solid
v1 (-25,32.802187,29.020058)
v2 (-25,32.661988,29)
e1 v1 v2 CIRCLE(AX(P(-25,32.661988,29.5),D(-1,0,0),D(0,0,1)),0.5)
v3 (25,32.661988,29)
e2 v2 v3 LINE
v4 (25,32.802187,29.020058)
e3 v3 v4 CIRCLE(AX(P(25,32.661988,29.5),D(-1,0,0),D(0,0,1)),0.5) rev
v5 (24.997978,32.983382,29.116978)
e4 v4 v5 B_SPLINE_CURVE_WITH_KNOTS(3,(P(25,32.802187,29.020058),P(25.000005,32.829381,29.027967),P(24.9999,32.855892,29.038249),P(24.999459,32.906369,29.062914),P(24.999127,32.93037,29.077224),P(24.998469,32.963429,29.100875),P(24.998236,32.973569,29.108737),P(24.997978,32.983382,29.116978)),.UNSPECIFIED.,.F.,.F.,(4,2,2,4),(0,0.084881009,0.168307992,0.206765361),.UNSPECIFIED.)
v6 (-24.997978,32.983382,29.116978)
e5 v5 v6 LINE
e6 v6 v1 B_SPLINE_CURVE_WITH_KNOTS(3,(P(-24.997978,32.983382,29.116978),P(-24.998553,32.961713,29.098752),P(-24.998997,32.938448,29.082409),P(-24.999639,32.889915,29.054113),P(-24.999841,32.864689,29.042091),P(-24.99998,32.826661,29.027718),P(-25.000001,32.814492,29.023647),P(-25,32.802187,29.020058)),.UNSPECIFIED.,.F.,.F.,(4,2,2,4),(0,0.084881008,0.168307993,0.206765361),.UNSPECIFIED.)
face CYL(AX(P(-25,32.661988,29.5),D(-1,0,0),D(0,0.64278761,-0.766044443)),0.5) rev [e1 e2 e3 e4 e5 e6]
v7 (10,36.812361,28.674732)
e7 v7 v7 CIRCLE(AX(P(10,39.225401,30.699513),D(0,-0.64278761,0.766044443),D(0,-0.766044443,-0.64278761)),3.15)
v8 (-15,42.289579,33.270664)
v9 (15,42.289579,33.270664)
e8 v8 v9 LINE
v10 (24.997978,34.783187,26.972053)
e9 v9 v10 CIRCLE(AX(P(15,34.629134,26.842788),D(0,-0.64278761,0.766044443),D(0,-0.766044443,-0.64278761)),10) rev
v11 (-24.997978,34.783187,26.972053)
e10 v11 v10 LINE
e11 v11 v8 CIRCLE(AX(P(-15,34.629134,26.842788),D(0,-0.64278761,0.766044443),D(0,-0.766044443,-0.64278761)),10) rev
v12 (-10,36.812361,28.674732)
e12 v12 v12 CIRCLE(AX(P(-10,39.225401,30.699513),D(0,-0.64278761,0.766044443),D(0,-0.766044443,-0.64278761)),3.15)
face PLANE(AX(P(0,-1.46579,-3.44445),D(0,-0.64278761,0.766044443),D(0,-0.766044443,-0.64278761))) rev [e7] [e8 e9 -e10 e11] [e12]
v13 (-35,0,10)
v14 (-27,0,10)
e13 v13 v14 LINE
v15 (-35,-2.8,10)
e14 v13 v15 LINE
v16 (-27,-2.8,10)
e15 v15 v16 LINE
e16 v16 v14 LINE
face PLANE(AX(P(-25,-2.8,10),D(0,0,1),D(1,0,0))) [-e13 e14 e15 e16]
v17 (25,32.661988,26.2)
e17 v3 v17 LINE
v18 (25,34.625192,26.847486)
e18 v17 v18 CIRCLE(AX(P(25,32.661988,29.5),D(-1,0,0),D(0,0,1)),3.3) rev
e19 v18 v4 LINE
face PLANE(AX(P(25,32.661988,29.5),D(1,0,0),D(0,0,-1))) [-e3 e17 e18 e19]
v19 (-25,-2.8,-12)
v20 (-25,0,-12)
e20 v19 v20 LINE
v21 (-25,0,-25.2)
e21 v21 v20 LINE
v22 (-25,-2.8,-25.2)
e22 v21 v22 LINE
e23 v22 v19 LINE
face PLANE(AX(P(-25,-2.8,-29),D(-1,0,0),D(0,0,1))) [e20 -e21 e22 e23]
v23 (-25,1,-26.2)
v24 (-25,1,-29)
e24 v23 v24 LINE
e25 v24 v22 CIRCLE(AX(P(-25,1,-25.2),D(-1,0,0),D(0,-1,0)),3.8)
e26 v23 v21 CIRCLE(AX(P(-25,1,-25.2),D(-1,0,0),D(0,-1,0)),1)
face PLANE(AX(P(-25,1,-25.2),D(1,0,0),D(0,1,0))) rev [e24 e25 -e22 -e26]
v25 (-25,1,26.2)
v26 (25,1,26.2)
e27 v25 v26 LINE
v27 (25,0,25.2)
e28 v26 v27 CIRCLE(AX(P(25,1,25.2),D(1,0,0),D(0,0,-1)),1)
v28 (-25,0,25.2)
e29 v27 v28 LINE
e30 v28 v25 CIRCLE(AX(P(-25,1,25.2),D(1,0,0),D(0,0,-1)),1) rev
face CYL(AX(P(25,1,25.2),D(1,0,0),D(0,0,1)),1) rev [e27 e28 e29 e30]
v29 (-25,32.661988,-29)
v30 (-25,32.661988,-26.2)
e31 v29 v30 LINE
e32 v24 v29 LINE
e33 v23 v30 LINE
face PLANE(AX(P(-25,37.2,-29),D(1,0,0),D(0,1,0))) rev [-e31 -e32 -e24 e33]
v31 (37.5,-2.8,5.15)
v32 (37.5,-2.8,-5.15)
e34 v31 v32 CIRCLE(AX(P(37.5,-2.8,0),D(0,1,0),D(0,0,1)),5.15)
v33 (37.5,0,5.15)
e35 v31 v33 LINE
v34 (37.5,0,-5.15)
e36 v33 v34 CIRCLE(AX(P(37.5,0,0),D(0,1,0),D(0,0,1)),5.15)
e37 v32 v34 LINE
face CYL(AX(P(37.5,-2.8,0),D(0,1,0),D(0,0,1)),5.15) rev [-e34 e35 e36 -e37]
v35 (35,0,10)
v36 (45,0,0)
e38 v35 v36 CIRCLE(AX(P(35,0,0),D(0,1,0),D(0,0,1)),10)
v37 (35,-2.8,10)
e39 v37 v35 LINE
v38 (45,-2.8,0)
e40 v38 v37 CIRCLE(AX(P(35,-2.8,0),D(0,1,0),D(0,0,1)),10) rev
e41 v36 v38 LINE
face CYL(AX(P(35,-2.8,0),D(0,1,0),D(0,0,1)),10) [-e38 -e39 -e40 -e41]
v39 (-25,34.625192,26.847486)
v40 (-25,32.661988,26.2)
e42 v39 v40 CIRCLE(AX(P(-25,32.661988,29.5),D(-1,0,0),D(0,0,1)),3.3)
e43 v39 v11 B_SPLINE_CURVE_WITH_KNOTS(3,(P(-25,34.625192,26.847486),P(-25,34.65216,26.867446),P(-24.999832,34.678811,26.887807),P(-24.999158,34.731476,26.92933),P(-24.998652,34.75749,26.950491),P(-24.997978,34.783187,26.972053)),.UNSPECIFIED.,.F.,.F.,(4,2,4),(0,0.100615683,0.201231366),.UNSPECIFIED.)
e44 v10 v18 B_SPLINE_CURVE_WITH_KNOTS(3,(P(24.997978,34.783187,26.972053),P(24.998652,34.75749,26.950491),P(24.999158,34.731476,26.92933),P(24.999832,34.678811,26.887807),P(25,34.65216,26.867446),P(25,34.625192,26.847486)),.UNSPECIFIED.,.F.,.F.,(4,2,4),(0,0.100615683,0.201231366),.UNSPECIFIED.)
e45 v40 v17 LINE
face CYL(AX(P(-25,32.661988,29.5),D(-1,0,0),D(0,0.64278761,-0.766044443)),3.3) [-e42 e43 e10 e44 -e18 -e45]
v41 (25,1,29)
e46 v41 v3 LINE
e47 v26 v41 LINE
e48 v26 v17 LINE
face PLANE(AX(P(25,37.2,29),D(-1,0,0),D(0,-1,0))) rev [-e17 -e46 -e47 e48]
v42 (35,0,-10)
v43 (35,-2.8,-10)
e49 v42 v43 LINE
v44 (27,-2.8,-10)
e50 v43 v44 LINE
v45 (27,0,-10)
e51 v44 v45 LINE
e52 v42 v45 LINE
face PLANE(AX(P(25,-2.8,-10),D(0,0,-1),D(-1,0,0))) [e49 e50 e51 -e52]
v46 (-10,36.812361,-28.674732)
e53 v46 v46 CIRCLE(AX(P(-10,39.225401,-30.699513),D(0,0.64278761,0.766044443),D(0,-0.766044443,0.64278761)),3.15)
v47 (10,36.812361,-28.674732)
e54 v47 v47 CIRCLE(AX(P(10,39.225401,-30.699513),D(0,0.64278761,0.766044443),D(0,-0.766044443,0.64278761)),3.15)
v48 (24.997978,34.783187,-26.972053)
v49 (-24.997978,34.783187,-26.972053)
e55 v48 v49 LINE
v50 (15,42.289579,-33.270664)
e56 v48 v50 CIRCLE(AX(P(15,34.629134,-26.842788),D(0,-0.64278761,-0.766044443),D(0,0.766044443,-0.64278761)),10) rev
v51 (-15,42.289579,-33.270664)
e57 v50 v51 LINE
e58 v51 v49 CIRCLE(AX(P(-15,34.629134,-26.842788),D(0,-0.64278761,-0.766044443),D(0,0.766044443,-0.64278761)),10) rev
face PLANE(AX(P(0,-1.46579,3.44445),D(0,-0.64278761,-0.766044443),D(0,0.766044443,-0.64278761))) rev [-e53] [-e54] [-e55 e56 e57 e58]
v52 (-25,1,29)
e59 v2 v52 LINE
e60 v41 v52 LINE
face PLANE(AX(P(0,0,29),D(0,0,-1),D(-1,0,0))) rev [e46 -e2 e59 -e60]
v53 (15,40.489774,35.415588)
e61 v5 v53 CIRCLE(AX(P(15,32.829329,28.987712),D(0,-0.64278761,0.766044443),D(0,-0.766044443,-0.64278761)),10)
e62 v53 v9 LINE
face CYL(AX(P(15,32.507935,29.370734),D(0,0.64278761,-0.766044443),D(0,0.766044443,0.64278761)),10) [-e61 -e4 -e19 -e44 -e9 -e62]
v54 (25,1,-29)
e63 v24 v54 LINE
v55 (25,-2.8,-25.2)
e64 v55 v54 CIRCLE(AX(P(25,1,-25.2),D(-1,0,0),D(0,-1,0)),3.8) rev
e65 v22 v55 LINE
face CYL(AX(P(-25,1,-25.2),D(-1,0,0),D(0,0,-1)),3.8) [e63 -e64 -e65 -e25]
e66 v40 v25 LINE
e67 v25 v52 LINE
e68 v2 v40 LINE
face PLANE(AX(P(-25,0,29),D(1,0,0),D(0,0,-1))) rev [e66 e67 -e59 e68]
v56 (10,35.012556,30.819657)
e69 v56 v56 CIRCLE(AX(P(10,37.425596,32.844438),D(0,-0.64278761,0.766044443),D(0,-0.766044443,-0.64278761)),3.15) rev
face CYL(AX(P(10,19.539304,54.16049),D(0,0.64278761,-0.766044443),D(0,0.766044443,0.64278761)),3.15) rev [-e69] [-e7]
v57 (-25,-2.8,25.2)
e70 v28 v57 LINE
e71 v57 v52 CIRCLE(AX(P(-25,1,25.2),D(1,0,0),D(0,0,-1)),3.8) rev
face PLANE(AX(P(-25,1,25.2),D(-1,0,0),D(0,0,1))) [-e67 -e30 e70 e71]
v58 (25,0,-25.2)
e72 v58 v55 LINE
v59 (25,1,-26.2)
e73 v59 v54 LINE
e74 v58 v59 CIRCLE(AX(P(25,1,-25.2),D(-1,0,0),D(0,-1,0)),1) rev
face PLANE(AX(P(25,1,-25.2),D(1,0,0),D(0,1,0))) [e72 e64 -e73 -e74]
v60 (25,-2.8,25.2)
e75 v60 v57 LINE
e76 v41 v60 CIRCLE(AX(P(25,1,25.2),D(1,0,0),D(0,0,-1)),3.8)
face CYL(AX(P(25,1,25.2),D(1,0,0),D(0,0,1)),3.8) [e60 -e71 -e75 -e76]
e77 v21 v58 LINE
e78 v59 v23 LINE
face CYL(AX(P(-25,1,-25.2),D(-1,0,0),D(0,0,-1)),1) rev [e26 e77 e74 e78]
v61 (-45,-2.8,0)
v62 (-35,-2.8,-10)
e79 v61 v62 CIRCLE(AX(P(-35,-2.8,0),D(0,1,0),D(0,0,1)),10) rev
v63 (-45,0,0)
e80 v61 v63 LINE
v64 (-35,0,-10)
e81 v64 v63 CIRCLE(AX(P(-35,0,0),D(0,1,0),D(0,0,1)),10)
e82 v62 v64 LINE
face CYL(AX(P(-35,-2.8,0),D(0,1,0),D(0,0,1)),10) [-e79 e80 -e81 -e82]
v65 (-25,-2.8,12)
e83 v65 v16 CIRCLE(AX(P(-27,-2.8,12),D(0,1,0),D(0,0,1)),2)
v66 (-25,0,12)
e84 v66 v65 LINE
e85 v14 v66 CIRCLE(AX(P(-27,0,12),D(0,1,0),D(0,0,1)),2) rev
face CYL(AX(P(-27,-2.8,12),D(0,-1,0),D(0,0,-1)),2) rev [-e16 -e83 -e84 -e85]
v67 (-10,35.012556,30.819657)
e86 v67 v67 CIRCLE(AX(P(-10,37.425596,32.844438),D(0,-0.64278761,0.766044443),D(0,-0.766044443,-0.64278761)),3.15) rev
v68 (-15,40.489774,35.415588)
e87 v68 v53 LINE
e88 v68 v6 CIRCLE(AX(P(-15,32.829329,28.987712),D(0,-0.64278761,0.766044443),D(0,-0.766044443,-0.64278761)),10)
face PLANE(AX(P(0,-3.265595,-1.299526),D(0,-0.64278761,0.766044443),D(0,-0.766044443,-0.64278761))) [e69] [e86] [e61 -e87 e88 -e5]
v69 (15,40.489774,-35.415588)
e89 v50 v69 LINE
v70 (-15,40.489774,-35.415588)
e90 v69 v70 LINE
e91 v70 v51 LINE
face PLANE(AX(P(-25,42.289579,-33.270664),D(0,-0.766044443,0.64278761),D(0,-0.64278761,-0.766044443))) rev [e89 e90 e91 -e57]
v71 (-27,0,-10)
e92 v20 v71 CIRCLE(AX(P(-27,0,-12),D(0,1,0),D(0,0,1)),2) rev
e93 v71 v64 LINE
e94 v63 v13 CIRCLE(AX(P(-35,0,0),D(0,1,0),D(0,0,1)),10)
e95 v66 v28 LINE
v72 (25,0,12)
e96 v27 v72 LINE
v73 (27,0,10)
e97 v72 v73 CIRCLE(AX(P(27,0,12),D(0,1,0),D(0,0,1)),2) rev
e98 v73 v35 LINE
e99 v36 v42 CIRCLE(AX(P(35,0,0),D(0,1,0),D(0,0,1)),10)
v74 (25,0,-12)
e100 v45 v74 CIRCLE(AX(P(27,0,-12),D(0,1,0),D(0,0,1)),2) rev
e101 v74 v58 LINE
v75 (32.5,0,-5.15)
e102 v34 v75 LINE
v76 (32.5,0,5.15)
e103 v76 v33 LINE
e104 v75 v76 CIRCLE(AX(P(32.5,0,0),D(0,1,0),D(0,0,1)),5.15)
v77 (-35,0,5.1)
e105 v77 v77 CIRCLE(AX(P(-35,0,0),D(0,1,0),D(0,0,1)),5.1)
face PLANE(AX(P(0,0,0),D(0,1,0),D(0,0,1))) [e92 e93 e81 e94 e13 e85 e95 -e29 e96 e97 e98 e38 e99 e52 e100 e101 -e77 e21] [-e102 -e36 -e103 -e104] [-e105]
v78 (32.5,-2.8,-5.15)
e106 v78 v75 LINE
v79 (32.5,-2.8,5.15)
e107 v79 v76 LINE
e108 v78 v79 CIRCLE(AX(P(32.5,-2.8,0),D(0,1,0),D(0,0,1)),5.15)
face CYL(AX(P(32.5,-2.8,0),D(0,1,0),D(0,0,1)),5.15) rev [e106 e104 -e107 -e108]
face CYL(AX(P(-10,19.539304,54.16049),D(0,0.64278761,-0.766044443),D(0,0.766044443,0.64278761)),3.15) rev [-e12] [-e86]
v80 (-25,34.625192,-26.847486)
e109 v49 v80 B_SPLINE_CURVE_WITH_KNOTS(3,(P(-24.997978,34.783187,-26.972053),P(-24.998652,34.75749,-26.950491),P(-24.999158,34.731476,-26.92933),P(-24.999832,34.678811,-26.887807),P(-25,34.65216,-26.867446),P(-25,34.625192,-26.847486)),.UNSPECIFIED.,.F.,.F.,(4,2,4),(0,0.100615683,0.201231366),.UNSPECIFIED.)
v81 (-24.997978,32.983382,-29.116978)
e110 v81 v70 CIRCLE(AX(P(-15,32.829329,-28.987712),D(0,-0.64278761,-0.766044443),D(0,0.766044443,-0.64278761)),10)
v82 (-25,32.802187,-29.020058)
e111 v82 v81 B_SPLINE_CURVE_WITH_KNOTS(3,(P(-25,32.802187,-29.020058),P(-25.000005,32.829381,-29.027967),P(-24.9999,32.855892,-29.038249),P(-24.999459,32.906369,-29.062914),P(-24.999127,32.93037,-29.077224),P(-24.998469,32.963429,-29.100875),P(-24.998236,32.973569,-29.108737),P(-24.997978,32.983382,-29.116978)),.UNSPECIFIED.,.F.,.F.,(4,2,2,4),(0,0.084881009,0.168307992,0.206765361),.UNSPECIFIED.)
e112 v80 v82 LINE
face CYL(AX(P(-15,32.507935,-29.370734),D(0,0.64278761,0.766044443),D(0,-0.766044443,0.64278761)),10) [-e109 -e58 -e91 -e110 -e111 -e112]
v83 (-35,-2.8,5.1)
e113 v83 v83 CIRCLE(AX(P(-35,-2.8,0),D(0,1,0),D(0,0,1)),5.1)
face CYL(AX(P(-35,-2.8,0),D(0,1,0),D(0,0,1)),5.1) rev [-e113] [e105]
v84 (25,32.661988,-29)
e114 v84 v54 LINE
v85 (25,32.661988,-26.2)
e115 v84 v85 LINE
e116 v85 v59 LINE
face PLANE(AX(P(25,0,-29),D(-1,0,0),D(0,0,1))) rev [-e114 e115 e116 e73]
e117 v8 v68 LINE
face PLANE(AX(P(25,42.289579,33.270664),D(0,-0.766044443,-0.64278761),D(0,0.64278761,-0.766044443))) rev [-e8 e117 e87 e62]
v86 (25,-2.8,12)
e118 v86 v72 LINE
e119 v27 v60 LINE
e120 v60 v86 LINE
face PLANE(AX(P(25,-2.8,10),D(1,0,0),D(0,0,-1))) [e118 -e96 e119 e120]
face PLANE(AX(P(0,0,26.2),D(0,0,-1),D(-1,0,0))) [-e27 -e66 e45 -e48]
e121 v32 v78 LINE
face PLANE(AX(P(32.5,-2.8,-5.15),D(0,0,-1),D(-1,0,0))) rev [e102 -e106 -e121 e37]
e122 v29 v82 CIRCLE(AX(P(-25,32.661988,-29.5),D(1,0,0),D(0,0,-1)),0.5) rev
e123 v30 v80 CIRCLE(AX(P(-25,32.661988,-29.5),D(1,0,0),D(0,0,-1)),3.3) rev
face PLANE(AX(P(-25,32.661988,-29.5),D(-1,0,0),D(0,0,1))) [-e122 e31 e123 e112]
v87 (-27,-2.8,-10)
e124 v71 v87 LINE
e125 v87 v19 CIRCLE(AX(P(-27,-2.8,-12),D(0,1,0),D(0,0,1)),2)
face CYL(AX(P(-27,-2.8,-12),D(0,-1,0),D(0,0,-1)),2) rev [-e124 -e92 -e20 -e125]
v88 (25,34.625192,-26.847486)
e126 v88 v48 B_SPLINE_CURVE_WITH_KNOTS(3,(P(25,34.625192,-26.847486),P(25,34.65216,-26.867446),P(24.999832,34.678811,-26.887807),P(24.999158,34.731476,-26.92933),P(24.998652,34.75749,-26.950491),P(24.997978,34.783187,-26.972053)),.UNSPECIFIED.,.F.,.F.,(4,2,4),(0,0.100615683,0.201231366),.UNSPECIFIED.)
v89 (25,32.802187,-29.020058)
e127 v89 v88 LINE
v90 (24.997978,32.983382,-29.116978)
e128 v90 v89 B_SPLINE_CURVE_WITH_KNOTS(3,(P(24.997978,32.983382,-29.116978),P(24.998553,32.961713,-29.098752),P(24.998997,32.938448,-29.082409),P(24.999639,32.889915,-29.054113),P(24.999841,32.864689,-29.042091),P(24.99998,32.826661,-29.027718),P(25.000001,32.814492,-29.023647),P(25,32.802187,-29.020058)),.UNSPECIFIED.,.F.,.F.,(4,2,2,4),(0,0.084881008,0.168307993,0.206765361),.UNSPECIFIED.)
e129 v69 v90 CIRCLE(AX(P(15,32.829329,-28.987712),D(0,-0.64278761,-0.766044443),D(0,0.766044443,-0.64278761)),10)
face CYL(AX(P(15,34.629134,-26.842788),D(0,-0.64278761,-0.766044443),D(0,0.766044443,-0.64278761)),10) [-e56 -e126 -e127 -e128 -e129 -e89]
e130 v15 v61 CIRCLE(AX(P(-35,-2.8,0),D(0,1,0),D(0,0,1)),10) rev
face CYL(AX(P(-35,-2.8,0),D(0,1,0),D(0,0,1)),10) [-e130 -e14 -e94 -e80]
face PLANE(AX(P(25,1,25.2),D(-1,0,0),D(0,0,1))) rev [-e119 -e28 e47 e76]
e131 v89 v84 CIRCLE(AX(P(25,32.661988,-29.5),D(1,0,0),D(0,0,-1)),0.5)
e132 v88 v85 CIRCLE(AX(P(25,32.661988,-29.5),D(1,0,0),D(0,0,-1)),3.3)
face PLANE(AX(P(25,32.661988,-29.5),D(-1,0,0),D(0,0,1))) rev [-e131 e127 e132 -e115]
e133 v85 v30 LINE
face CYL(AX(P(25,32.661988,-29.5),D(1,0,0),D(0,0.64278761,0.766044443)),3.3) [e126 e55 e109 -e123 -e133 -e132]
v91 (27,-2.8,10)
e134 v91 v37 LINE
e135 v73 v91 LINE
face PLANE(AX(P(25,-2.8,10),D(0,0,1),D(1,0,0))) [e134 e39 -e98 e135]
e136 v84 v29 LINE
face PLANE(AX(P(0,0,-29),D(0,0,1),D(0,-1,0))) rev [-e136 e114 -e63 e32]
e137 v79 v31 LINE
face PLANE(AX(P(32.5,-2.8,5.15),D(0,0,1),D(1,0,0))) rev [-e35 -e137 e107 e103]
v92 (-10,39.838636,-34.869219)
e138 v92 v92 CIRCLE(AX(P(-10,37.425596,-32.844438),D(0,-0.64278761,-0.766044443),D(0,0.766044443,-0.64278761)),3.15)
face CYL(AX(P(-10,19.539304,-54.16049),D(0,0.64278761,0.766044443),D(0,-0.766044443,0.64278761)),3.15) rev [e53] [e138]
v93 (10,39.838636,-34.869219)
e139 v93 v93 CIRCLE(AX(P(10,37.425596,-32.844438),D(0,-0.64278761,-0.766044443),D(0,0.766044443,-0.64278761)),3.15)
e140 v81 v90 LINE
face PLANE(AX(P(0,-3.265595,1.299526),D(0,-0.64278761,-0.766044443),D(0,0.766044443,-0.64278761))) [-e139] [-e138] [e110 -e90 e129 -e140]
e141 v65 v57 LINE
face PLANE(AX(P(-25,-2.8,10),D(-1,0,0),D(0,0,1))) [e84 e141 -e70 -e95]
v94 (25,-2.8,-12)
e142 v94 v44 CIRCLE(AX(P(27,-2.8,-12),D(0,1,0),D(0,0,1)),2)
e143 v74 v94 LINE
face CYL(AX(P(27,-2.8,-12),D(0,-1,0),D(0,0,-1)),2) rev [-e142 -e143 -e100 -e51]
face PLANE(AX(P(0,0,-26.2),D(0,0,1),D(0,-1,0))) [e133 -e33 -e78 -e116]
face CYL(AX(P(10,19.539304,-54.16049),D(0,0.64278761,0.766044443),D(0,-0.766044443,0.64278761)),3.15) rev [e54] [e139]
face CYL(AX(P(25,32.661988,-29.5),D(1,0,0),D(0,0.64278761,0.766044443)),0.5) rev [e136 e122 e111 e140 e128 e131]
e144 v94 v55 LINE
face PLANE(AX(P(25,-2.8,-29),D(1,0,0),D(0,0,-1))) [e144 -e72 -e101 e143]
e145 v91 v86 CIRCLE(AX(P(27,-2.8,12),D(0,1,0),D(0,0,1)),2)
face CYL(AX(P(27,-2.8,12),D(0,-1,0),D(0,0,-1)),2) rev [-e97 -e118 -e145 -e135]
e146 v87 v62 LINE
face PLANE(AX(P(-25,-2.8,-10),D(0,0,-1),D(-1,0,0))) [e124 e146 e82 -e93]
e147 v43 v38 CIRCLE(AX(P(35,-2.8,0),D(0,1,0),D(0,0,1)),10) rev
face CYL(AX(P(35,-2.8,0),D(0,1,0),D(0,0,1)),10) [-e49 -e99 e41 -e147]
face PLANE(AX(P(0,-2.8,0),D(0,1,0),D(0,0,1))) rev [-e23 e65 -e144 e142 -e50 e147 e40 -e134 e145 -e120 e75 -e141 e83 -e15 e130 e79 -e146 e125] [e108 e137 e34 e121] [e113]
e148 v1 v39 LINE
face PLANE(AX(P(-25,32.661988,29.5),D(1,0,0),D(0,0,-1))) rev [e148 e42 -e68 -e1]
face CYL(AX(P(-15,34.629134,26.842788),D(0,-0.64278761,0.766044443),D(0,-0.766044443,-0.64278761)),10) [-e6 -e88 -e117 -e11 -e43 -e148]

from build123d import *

# Parameters (mm, degrees)
SKETCH1_R                      = 5.1
BASE_FLANGE1_DEPTH             = 2.8
EDGE_FLANGE1_STRIP_W           = 13.2
EDGE_FLANGE1_STRIP_H           = 2.8
EDGE_FLANGE1_STRIP_CUT_DEPTH   = 50
EDGE_FLANGE1_STRIP_2_W         = 13.2
EDGE_FLANGE1_STRIP_2_H         = 2.8
EDGE_FLANGE1_STRIP_CUT_2_DEPTH = 50
EDGE_FLANGE1_DEPTH             = 50
EDGE_FLANGE1_BEND_DEPTH        = 50
EDGE_FLANGE2_START             = -25
EDGE_FLANGE2_DEPTH             = 50
EDGE_FLANGE2_2_DEPTH           = 50
SKETCH20_R                     = 3.15
CUT_EXTRUDE1_DEPTH             = 72.206525832
FILLET1_R                      = 10
FILLET2_R                      = 2


# Read off the part's stored shape, not the designer's step: Edge-Flange2
# Sheet-metal steps are written as plain solids
with BuildPart() as part:
    # Sketch1 → Base-Flange1 (new body)
    with BuildSketch(Plane(origin=(0, 0, 0), x_dir=(1, 0, 0), z_dir=(0, 1, 0))):
        Polygon((-25, 29), (25, 29), (25, 10), (45, 10), (45, -10), (25, -10), (25, -29), (-25, -29), (-25, -10), (-45, -10), (-45, 10), (-25, 10), align=None)
        with Locations(Location((-35, 0, 0), (0, 0, 270))):
            Circle(SKETCH1_R, mode=Mode.SUBTRACT)
        with BuildLine():
            Line((32.5, 5.15), (37.5, 5.15))
            ThreePointArc((37.5, 5.15), (42.65, 0), (37.5, -5.15))
            Line((37.5, -5.15), (32.5, -5.15))
            ThreePointArc((32.5, -5.15), (27.35, 0), (32.5, 5.15))
        make_face(mode=Mode.SUBTRACT)
    extrude(amount=-BASE_FLANGE1_DEPTH)

    # Edge-Flange1 strip (across the edge) → Edge-Flange1 strip cut (cut)
    with BuildSketch(Plane(origin=(25, 0, -29), x_dir=(0, 0, 1), z_dir=(-1, 0, 0))):
        with Locations((-2.8, -1.4)):
            Rectangle(EDGE_FLANGE1_STRIP_W, EDGE_FLANGE1_STRIP_H)
    extrude(amount=EDGE_FLANGE1_STRIP_CUT_DEPTH, mode=Mode.SUBTRACT)

    # Edge-Flange1 strip 2 (across the edge) → Edge-Flange1 strip cut 2 (cut)
    with BuildSketch(Plane(origin=(-25, 0, 29), x_dir=(0, 0, -1), z_dir=(1, 0, 0))):
        with Locations((-2.8, -1.4)):
            Rectangle(EDGE_FLANGE1_STRIP_2_W, EDGE_FLANGE1_STRIP_2_H)
    extrude(amount=EDGE_FLANGE1_STRIP_CUT_2_DEPTH, mode=Mode.SUBTRACT)

    # Edge-Flange1 section (across the edge) → Edge-Flange1 (add)
    with BuildSketch(Plane(origin=(25, 0, -29), x_dir=(0, 0, 1), z_dir=(-1, 0, 0))):
        with BuildLine():
            Line((0, 1), (0, 37.2))
            Line((0, 37.2), (2.8, 37.2))
            Line((2.8, 37.2), (2.8, 1))
            ThreePointArc((2.8, 1), (3.092893219, 0.292893219), (3.8, 0))
            Line((3.8, 0), (3.8, -2.8))
            ThreePointArc((3.8, -2.8), (1.112994231, -1.687005769), (0, 1))
        make_face()
    extrude(amount=EDGE_FLANGE1_DEPTH)

    # Edge-Flange1 section 2 (across the edge) → Edge-Flange1 bend (add)
    with BuildSketch(Plane(origin=(-25, 0, 29), x_dir=(0, 0, -1), z_dir=(1, 0, 0))):
        with BuildLine():
            Line((0, 1), (0, 37.2))
            Line((0, 37.2), (2.8, 37.2))
            Line((2.8, 37.2), (2.8, 1))
            ThreePointArc((2.8, 1), (3.092893219, 0.292893219), (3.8, 0))
            Line((3.8, 0), (3.8, -2.8))
            ThreePointArc((3.8, -2.8), (1.112994231, -1.687005769), (0, 1))
        make_face()
    extrude(amount=EDGE_FLANGE1_BEND_DEPTH)

    # Edge-Flange2 outline → Edge-Flange2 (cut)
    with BuildSketch(Plane.YZ.offset(EDGE_FLANGE2_START)):
        with BuildLine():
            ThreePointArc((32.661988168, -26.2), (33.790654641, -26.399014351), (34.78318728, -26.972053338))
            Line((34.78318728, -26.972053338), (37.2, -29))
            Line((37.2, -29), (37.2, -26.2))
            Line((37.2, -26.2), (32.661988168, -26.2))
        make_face()
        with BuildLine():
            Line((37.2, 29), (34.78318728, 26.972053338))
            ThreePointArc((34.78318728, 26.972053338), (33.790654641, 26.399014351), (32.661988168, 26.2))
            Line((32.661988168, 26.2), (37.2, 26.2))
            Line((37.2, 26.2), (37.2, 29))
        make_face()
    extrude(amount=EDGE_FLANGE2_DEPTH, mode=Mode.SUBTRACT)

    # Edge-Flange2 2 outline → Edge-Flange2 2 (add)
    with BuildSketch(Plane.YZ.offset(EDGE_FLANGE2_START)):
        with BuildLine():
            Line((42.289578815, -33.270663707), (37.2, -29))
            Line((37.2, -29), (32.661988168, -29))
            ThreePointArc((32.661988168, -29), (32.832998239, -29.03015369), (32.983381973, -29.116977778))
            Line((32.983381973, -29.116977778), (40.489773508, -35.415588147))
            Line((40.489773508, -35.415588147), (42.289578815, -33.270663707))
        make_face()
        with BuildLine():
            Line((32.661988168, 29), (37.2, 29))
            Line((37.2, 29), (42.289578815, 33.270663707))
            Line((42.289578815, 33.270663707), (40.489773508, 35.415588147))
            Line((40.489773508, 35.415588147), (32.983381973, 29.116977778))
            ThreePointArc((32.983381973, 29.116977778), (32.832998239, 29.03015369), (32.661988168, 29))
        make_face()
    extrude(amount=EDGE_FLANGE2_2_DEPTH)

    # Sketch20 → Cut-Extrude1 (cut, through all)
    with BuildSketch(Plane(origin=(0, 1.090431477, 1.29952563), x_dir=(1, 0, 0), z_dir=(0, 0.642787609686538, 0.7660444431189792))):
        with Locations(Location((-10, 49.78166725, 0), (0, 0, 270))):
            Circle(SKETCH20_R)
        with Locations(Location((10, 49.78166725, 0), (0, 0, 270))):
            Circle(SKETCH20_R)
    cut_extrude1 = extrude(amount=-CUT_EXTRUDE1_DEPTH, mode=Mode.SUBTRACT)

    # Mirror2: Cut-Extrude1 across plane
    add(cut_extrude1.mirror(Plane.XY), mode=Mode.SUBTRACT)

    # Fillet1
    # the kernel refuses this fillet: 10 mm, written as the material it takes off along each edge
    with BuildSketch(Plane(origin=(45, 25, -10), x_dir=(0, 0, 1), z_dir=(0, -1, 0)), Plane(origin=(45, 25, 10), x_dir=(-1, 0, 0), z_dir=(0, -1, 0)), Plane(origin=(-45, 25, -10), x_dir=(1, 0, 0), z_dir=(0, -1, 0)), Plane(origin=(-45, 25, 10), x_dir=(0, 0, -1), z_dir=(0, -1, 0))) as fillet1_piece_1:
        with BuildLine():
            CenterArc((FILLET1_R, FILLET1_R), FILLET1_R, 180, 90)
            Line((0, FILLET1_R), (0, 0))
            Line((0, 0), (FILLET1_R, 0))
        make_face()
    extrude(amount=52.8, mode=Mode.SUBTRACT)
    with BuildSketch(Plane(origin=(-25, 58.35926906, 14.119552631), x_dir=(0, -0.7660444430323039, -0.6427876097898334), z_dir=(0, -0.6427876097898335, 0.766044443032304)), Plane(origin=(25, 24.420083263, -54.566699223), x_dir=(-1, 0, 0), z_dir=(0, 0.6427876097898335, 0.766044443032304)), Plane(origin=(-25, 24.420083263, -54.566699223), x_dir=(0, -0.7660444430323039, 0.6427876097898334), z_dir=(0, 0.6427876097898335, 0.766044443032304))) as fillet1_piece_2:
        with BuildLine():
            CenterArc((FILLET1_R, FILLET1_R), FILLET1_R, 180, 90)
            Line((0, FILLET1_R), (0, 0))
            Line((0, 0), (FILLET1_R, 0))
        make_face()
    extrude(amount=52.799999999, mode=Mode.SUBTRACT)
    with BuildSketch(Plane(origin=(25, 58.35926906, 14.119552631), x_dir=(0, -0.766044443032304, -0.6427876097898335), z_dir=(0, -0.6427876097898335, 0.766044443032304))) as fillet1_piece_3:
        with BuildLine():
            CenterArc((FILLET1_R, -FILLET1_R), FILLET1_R, 90, 90)
            Line((0, -FILLET1_R), (0, 0))
            Line((0, 0), (FILLET1_R, 0))
        make_face()
    extrude(amount=52.799999999, mode=Mode.SUBTRACT)

    # Fillet2
    fillet2_edges = [part.edges().sort_by_distance(p)[0] for p in [
        (-25, -1.4, 10),
        (-25, -1.4, -10),
        (25, -1.4, -10),
        (25, -1.4, 10),
    ]]
    fillet(fillet2_edges, radius=FILLET2_R)


solid = part.part
